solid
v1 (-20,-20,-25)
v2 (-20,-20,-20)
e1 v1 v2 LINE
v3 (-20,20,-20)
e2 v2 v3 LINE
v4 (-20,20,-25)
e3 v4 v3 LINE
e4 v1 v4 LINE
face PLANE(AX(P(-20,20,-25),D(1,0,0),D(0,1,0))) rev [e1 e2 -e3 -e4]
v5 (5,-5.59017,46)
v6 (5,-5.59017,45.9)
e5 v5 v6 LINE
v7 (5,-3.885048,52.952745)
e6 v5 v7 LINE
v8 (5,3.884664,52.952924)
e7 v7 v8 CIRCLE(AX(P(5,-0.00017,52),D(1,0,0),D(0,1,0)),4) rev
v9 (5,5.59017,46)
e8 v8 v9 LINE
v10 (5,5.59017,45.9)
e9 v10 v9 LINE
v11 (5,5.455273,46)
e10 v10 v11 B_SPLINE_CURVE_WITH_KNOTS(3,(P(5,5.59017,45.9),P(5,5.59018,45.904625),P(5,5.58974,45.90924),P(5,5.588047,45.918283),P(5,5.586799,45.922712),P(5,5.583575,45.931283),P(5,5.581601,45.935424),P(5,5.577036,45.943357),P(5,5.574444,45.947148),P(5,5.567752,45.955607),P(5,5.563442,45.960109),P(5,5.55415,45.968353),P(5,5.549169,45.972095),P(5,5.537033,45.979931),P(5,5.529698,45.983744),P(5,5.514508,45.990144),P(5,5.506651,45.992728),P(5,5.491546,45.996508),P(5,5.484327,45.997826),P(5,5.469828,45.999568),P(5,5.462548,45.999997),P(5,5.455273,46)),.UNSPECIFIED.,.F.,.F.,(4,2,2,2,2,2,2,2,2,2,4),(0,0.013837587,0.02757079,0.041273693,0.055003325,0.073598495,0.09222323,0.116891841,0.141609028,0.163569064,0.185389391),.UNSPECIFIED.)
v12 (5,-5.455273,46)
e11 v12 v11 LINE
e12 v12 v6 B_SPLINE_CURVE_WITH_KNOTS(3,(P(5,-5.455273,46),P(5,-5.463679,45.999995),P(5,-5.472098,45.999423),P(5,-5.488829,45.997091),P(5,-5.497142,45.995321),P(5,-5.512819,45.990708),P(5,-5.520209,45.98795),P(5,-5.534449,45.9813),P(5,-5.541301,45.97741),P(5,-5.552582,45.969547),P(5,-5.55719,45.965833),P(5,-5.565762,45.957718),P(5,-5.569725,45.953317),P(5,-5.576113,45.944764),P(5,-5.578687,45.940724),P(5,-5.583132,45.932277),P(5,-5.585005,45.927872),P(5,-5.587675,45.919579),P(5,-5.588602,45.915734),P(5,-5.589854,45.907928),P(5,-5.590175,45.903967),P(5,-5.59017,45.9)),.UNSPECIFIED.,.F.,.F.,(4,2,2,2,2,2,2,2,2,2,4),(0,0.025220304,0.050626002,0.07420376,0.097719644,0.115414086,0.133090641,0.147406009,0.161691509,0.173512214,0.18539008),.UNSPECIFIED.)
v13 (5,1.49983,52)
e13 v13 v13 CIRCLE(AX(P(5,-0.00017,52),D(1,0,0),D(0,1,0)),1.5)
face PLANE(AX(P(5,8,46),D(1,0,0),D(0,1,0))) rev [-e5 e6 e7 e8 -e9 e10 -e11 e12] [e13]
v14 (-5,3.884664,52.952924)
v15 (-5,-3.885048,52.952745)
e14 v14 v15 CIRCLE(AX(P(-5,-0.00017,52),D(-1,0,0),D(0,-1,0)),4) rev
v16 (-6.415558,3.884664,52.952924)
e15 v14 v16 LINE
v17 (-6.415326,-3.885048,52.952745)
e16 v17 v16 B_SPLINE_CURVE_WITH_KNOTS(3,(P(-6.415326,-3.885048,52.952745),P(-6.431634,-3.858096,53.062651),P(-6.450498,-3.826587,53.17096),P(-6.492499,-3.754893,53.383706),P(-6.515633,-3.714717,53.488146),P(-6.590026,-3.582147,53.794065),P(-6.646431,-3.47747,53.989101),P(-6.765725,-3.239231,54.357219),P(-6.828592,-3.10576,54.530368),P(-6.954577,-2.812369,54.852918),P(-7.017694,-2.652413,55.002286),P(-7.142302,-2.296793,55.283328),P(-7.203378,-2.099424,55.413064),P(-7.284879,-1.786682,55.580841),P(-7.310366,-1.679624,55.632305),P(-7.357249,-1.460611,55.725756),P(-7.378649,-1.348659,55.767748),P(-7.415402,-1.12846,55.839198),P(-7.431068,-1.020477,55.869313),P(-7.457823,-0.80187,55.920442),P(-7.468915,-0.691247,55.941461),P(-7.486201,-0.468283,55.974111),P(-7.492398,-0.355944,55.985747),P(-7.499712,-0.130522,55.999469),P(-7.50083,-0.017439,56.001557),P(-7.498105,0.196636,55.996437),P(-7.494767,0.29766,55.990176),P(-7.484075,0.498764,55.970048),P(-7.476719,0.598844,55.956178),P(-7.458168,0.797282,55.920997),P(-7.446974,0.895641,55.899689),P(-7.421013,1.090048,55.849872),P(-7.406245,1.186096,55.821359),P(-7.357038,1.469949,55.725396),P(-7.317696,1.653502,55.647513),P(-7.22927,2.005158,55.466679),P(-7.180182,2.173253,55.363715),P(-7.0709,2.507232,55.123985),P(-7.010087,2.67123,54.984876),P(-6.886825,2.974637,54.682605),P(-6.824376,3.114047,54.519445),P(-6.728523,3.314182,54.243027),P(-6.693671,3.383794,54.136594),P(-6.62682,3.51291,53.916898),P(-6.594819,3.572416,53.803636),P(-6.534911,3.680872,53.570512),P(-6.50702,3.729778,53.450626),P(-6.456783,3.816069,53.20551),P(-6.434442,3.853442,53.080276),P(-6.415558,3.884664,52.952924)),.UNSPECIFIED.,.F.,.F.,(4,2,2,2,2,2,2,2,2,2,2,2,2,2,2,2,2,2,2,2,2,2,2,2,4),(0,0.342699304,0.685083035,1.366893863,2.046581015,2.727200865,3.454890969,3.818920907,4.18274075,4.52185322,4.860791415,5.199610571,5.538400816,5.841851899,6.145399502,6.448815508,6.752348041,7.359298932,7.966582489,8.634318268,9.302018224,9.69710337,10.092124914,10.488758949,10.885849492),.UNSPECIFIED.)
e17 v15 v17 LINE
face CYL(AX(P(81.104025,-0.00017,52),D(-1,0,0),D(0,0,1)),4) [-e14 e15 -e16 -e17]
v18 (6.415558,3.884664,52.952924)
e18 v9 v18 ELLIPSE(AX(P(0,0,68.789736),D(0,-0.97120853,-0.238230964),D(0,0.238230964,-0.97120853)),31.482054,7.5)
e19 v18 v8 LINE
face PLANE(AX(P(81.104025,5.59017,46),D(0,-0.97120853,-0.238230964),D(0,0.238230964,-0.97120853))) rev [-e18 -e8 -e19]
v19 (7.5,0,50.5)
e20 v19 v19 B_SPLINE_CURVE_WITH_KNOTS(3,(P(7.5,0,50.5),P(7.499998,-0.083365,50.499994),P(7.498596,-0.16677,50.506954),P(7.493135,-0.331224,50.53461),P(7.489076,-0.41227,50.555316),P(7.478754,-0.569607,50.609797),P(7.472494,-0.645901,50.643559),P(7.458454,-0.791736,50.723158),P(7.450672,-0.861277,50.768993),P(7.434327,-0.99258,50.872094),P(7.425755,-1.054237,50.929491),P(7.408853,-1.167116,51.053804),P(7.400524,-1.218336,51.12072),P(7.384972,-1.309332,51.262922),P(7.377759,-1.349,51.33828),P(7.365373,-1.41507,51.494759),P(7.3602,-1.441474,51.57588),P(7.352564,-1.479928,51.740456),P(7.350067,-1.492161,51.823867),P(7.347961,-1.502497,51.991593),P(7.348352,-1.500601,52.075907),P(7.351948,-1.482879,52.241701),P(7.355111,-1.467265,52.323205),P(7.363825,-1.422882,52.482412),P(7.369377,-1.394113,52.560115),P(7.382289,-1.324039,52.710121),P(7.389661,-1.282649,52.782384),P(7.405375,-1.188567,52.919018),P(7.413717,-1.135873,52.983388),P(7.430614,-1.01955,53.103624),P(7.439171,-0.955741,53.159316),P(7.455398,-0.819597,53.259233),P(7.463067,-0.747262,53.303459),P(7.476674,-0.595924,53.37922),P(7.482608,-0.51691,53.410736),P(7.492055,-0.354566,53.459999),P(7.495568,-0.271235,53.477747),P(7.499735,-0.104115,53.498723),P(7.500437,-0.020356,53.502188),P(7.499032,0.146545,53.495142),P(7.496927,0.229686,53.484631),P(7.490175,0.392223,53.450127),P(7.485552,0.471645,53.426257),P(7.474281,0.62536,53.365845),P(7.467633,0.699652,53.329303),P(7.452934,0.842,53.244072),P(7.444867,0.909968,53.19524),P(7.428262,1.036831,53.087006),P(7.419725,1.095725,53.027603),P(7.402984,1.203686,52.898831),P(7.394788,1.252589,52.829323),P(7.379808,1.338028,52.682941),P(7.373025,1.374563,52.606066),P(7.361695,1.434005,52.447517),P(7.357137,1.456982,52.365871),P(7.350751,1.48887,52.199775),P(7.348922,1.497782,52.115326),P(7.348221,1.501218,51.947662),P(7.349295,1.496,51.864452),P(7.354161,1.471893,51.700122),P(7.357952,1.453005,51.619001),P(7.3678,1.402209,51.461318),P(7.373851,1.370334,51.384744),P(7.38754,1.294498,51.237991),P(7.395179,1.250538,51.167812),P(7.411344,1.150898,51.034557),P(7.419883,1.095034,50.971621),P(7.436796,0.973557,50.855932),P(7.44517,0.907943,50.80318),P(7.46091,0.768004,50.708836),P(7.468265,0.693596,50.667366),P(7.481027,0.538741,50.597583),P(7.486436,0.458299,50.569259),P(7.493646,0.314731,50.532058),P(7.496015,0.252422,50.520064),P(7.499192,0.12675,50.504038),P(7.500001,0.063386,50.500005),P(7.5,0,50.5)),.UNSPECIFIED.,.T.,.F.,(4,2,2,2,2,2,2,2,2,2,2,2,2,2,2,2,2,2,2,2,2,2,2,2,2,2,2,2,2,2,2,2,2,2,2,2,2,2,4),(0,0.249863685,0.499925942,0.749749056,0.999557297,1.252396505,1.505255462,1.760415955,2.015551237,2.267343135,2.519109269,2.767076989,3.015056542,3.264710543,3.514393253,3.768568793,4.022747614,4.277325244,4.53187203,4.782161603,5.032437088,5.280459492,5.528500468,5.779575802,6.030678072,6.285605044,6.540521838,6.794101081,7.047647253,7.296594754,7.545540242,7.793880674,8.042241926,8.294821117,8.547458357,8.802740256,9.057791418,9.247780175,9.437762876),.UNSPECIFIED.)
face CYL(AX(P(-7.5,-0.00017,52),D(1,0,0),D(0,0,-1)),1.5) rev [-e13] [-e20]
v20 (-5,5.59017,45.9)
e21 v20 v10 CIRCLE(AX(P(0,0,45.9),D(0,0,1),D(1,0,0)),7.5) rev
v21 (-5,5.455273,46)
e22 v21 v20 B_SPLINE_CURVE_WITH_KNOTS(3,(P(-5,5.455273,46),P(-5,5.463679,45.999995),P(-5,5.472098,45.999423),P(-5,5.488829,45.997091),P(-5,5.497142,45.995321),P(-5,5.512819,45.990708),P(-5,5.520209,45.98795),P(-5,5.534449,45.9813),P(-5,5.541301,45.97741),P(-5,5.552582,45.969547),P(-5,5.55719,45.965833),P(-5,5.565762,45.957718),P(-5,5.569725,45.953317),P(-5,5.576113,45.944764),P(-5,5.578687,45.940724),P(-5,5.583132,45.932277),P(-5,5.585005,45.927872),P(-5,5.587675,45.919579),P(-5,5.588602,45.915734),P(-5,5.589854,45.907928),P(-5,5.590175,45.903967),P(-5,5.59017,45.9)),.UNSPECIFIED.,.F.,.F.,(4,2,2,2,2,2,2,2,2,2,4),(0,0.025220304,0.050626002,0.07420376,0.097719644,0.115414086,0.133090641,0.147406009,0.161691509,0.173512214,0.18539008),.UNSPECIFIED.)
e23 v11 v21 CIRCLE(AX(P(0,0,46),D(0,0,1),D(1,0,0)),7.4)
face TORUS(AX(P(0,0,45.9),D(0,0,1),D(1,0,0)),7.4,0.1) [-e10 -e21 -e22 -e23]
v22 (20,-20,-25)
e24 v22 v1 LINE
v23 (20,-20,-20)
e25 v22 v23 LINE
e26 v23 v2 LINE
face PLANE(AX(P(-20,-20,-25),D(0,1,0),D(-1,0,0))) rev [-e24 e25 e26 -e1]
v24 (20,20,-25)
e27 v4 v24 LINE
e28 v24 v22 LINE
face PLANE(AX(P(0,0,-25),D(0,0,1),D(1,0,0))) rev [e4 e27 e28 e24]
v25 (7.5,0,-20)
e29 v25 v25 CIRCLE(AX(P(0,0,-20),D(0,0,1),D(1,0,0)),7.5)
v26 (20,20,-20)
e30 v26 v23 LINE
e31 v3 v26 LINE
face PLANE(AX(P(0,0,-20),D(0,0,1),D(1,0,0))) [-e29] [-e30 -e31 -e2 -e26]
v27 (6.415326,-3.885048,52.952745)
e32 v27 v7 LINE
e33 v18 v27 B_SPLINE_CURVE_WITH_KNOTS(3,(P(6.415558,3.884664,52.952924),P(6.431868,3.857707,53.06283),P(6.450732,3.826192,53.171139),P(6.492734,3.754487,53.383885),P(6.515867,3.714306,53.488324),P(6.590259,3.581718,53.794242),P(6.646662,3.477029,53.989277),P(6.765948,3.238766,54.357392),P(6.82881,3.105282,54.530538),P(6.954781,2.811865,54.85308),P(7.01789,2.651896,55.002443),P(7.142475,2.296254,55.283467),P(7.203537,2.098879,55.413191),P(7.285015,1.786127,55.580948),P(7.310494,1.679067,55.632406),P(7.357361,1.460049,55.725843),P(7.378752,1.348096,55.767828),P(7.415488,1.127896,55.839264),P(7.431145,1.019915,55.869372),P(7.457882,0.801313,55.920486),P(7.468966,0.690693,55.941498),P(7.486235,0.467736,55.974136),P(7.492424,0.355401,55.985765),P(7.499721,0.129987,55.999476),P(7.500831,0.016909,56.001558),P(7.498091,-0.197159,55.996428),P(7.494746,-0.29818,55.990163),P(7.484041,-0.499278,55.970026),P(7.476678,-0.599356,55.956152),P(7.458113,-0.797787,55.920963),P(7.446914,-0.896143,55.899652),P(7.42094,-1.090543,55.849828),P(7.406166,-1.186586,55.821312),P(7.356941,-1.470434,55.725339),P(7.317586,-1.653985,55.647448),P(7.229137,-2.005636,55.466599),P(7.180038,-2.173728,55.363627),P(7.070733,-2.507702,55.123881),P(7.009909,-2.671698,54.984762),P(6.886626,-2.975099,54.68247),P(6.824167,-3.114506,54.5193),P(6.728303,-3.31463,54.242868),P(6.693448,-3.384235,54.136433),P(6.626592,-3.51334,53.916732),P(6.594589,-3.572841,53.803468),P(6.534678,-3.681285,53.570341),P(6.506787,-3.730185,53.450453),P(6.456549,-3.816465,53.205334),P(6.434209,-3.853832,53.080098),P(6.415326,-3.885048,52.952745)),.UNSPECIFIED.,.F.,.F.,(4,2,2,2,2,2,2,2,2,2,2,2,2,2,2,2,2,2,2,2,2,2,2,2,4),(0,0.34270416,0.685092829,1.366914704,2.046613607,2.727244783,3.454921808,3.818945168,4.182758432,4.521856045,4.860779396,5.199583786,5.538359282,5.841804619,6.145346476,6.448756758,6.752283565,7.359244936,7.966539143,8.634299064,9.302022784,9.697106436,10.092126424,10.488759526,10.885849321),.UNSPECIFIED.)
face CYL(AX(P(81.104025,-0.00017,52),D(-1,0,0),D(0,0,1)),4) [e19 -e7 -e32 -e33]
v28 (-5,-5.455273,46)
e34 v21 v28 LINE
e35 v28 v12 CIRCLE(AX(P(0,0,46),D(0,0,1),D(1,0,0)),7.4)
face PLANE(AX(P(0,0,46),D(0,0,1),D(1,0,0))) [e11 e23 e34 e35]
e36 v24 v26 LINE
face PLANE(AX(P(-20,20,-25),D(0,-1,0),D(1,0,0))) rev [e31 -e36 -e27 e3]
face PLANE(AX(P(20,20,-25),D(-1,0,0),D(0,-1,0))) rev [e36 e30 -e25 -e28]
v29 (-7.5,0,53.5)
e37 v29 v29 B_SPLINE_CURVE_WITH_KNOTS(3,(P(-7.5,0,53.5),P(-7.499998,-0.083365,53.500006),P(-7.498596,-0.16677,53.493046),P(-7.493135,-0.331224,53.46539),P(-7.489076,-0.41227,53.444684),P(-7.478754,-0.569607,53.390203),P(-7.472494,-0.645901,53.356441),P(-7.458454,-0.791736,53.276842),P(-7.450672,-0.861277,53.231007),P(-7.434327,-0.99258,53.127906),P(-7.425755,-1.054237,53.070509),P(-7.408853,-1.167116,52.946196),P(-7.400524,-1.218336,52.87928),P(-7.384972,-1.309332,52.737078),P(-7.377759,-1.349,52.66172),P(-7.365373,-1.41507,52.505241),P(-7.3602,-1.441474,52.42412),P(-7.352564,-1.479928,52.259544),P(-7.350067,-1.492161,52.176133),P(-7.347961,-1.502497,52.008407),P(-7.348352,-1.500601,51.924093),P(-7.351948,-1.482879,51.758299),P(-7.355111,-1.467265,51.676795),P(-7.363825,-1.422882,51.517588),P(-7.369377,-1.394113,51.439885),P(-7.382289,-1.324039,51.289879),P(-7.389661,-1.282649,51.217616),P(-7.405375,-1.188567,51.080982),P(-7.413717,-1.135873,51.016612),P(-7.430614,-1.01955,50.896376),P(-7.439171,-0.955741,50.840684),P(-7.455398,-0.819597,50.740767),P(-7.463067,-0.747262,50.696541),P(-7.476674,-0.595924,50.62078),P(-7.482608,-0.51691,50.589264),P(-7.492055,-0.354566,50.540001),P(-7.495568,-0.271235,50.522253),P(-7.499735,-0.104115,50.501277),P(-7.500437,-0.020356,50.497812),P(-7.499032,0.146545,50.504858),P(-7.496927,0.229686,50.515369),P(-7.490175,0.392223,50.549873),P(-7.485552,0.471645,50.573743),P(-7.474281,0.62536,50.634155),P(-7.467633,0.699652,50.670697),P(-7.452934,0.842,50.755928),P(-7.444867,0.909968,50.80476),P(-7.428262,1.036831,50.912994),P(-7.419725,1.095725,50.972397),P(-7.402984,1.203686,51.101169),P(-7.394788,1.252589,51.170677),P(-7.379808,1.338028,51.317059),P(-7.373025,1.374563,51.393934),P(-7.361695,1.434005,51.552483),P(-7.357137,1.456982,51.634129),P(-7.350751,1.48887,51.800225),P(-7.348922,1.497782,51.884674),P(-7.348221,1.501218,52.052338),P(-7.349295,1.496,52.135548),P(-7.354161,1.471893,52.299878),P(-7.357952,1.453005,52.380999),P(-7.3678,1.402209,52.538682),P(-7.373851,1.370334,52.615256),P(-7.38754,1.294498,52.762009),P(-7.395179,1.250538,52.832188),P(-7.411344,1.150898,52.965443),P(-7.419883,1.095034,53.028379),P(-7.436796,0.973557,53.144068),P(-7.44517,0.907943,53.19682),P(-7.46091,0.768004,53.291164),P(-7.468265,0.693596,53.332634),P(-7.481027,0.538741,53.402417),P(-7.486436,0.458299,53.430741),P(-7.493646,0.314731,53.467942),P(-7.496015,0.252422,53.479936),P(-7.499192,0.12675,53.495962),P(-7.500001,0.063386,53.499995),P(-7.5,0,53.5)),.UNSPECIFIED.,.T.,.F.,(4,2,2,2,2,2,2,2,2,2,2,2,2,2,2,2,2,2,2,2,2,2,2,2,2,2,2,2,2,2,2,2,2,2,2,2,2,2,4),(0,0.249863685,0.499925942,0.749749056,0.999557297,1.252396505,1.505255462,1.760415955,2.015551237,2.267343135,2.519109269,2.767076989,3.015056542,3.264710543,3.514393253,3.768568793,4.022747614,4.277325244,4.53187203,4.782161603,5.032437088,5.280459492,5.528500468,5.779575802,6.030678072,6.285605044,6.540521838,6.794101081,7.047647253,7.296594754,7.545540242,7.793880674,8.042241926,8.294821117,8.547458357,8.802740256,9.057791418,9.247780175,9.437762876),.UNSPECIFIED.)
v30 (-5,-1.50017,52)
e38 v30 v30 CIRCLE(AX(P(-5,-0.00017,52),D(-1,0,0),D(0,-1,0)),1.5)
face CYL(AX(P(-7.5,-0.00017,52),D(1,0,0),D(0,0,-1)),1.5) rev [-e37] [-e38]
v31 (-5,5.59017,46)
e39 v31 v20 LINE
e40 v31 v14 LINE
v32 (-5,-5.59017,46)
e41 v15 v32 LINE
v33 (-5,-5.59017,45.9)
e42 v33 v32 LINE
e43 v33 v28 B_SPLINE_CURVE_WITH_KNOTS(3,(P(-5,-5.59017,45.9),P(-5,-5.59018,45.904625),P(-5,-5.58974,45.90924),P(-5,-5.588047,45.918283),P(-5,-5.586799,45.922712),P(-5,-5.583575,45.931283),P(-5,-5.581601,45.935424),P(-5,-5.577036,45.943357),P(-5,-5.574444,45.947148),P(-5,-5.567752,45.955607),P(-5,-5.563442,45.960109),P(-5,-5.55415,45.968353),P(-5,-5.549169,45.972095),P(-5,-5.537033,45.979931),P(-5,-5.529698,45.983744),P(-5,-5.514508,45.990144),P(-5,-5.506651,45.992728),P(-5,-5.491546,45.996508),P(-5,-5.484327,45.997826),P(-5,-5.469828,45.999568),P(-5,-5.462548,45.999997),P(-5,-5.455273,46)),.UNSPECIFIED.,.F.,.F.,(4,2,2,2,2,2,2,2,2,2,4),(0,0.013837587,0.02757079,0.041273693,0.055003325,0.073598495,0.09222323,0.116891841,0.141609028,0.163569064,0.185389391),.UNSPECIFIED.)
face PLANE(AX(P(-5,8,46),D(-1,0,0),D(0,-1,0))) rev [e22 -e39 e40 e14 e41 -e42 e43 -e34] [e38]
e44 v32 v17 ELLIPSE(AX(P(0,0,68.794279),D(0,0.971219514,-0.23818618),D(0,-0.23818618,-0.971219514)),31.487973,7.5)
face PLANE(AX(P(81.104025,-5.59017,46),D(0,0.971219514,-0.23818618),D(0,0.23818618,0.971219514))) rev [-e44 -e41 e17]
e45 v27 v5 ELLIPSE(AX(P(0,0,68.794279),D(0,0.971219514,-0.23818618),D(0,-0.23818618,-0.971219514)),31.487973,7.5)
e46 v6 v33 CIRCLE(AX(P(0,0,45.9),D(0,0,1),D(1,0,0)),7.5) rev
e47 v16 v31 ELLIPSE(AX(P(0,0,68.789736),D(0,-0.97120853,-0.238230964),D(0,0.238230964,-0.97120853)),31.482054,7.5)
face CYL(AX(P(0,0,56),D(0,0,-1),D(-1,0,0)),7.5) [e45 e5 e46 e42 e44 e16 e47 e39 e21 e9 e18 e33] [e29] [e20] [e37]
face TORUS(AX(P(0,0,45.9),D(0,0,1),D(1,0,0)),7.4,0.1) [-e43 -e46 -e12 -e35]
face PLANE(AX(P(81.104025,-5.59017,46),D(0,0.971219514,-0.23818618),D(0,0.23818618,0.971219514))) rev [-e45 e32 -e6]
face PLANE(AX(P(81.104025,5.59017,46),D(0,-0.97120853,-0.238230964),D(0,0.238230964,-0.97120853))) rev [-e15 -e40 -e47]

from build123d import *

# Parameters (mm, degrees)
SKETCH1_R               = 7.5
BOSS_EXTRUDE1_DEPTH     = 56
SKETCH2_W               = 10
SKETCH2_H               = 16
CUT_EXTRUDE1_DEPTH      = 10
CUT_EXTRUDE4_DEPTH      = 57.995613866
CUT_EXTRUDE4_DEPTH_BACK = 57.995613866
CUT_EXTRUDE5_DEPTH      = 57.995613991
CUT_EXTRUDE5_DEPTH_BACK = 57.995613991
SKETCH4_R               = 1.5
FILLET1_R               = 0.1
SKETCH5_W               = 7.5
SKETCH5_H               = 20
SKETCH6_W               = 40
SKETCH6_H               = 40
BOSS_EXTRUDE2_DEPTH     = 5


with BuildPart() as part:
    # Sketch1 → Boss-Extrude1 (new body)
    with BuildSketch(Plane.XY):
        Circle(SKETCH1_R)
    extrude(amount=BOSS_EXTRUDE1_DEPTH)

    # Sketch2 → Cut-Extrude1 (cut)
    with BuildSketch(Plane.XY.offset(56)):
        Rectangle(SKETCH2_W, SKETCH2_H)
    extrude(amount=-CUT_EXTRUDE1_DEPTH, mode=Mode.SUBTRACT)

    # Sketch3 → Cut-Extrude4 (cut, two sides: drawn at the far end of the back side and taken through both)
    with BuildSketch(Plane(origin=(0, 0, 0), x_dir=(0, 0, -1), z_dir=(1, 0, 0)).offset(-CUT_EXTRUDE4_DEPTH_BACK)):
        with BuildLine():
            Line((-46, -114.267763227), (-46, -7.5))
            Line((-46, -7.5), (-46, -5.590169944))
            Line((-46, -5.590169944), (-52.952744721, -3.885047998))
            ThreePointArc((-52.952744721, -3.885047998), (-55.999999999, -0.000262165), (-52.952923855, 3.884664175))
            Line((-52.952923855, 3.884664175), (-46, 5.590169944))
            Line((-46, 5.590169944), (-46, 7.5))
            Line((-46, 7.5), (-46, 114.267763227))
            Line((-46, 114.267763227), (-259.535526454, 114.267763227))
            Line((-259.535526454, 114.267763227), (-259.535526454, -114.267763227))
            Line((-259.535526454, -114.267763227), (-46, -114.267763227))
        make_face()
    extrude(amount=CUT_EXTRUDE4_DEPTH + CUT_EXTRUDE4_DEPTH_BACK, mode=Mode.SUBTRACT)

    # Sketch4 → Cut-Extrude5 (cut, two sides: drawn at the far end of the back side and taken through both)
    with BuildSketch(Plane(origin=(0, 0, 0), x_dir=(0, 0, -1), z_dir=(1, 0, 0)).offset(-CUT_EXTRUDE5_DEPTH_BACK)):
        with Locations(Location((-52, -0.000169944, 0), (0, 0, 0.006491373))):
            Circle(SKETCH4_R)
    extrude(amount=CUT_EXTRUDE5_DEPTH + CUT_EXTRUDE5_DEPTH_BACK, mode=Mode.SUBTRACT)

    # Fillet1
    # the kernel refuses this fillet: 0.1 mm, written as the material it takes off along each edge
    with BuildSketch(Plane(origin=(0, 0, 46), x_dir=(0.6911452834399255, -0.7227158481580054, 0), z_dir=(0.7227158481580054, 0.6911452834399255, 0))) as fillet1_piece_1_section:
        with BuildLine():
            CenterArc((7.5 - FILLET1_R, FILLET1_R), FILLET1_R, 270, 90)
            Line((7.5 - FILLET1_R, 0), (7.5, 0))
            Line((7.5, 0), (7.5, FILLET1_R))
        make_face()
    fillet1_piece_1 = revolve(axis=Axis((0, 0, 46), (0, 0, -1)), revolution_arc=87.441672972, mode=Mode.PRIVATE)
    fillet1_piece_1 = split(fillet1_piece_1, bisect_by=Plane(origin=(5, -5.569278278, 45.983069625), z_dir=(-1, 0, 0)), keep=Keep.TOP, mode=Mode.PRIVATE)
    fillet1_piece_1 = split(fillet1_piece_1, bisect_by=Plane(origin=(-5, -5.569278278, 45.983069625), z_dir=(1, 0, 0)), keep=Keep.TOP, mode=Mode.PRIVATE)
    add(fillet1_piece_1, mode=Mode.SUBTRACT)
    with BuildSketch(Plane(origin=(0, 0, 46), x_dir=(-0.6911452834399255, 0.7227158481580054, 0), z_dir=(-0.7227158481580054, -0.6911452834399255, 0))) as fillet1_piece_2_section:
        with BuildLine():
            CenterArc((7.5 - FILLET1_R, FILLET1_R), FILLET1_R, 270, 90)
            Line((7.5 - FILLET1_R, 0), (7.5, 0))
            Line((7.5, 0), (7.5, FILLET1_R))
        make_face()
    fillet1_piece_2 = revolve(axis=Axis((0, 0, 46), (0, 0, -1)), revolution_arc=87.441672972, mode=Mode.PRIVATE)
    fillet1_piece_2 = split(fillet1_piece_2, bisect_by=Plane(origin=(5, 5.569279246, 45.98306893), z_dir=(-1, 0, 0)), keep=Keep.TOP, mode=Mode.PRIVATE)
    fillet1_piece_2 = split(fillet1_piece_2, bisect_by=Plane(origin=(-5, 5.569279246, 45.98306893), z_dir=(1, 0, 0)), keep=Keep.TOP, mode=Mode.PRIVATE)
    add(fillet1_piece_2, mode=Mode.SUBTRACT)

    # Sketch5 → Revolve1 (revolve)
    with BuildSketch(Plane(origin=(0, 0, 0), x_dir=(1, 0, 0), z_dir=(0, 1, 0)), mode=Mode.PRIVATE) as revolve1_sk:
        with Locations((-3.75, 10)):
            Rectangle(SKETCH5_W, SKETCH5_H)
    revolve(revolve1_sk.sketch.rotate(Axis((0, 0, 0), (0, 0, -1)), 31.195191598), axis=Axis((0, 0, 0), (0, 0, -1)))

    # Sketch6 → Boss-Extrude2 (add)
    with BuildSketch(Plane(origin=(0, 0, -20), x_dir=(-1, 0, 0), z_dir=(0, 0, -1))):
        Rectangle(SKETCH6_W, SKETCH6_H)
    extrude(amount=BOSS_EXTRUDE2_DEPTH)


solid = part.part
